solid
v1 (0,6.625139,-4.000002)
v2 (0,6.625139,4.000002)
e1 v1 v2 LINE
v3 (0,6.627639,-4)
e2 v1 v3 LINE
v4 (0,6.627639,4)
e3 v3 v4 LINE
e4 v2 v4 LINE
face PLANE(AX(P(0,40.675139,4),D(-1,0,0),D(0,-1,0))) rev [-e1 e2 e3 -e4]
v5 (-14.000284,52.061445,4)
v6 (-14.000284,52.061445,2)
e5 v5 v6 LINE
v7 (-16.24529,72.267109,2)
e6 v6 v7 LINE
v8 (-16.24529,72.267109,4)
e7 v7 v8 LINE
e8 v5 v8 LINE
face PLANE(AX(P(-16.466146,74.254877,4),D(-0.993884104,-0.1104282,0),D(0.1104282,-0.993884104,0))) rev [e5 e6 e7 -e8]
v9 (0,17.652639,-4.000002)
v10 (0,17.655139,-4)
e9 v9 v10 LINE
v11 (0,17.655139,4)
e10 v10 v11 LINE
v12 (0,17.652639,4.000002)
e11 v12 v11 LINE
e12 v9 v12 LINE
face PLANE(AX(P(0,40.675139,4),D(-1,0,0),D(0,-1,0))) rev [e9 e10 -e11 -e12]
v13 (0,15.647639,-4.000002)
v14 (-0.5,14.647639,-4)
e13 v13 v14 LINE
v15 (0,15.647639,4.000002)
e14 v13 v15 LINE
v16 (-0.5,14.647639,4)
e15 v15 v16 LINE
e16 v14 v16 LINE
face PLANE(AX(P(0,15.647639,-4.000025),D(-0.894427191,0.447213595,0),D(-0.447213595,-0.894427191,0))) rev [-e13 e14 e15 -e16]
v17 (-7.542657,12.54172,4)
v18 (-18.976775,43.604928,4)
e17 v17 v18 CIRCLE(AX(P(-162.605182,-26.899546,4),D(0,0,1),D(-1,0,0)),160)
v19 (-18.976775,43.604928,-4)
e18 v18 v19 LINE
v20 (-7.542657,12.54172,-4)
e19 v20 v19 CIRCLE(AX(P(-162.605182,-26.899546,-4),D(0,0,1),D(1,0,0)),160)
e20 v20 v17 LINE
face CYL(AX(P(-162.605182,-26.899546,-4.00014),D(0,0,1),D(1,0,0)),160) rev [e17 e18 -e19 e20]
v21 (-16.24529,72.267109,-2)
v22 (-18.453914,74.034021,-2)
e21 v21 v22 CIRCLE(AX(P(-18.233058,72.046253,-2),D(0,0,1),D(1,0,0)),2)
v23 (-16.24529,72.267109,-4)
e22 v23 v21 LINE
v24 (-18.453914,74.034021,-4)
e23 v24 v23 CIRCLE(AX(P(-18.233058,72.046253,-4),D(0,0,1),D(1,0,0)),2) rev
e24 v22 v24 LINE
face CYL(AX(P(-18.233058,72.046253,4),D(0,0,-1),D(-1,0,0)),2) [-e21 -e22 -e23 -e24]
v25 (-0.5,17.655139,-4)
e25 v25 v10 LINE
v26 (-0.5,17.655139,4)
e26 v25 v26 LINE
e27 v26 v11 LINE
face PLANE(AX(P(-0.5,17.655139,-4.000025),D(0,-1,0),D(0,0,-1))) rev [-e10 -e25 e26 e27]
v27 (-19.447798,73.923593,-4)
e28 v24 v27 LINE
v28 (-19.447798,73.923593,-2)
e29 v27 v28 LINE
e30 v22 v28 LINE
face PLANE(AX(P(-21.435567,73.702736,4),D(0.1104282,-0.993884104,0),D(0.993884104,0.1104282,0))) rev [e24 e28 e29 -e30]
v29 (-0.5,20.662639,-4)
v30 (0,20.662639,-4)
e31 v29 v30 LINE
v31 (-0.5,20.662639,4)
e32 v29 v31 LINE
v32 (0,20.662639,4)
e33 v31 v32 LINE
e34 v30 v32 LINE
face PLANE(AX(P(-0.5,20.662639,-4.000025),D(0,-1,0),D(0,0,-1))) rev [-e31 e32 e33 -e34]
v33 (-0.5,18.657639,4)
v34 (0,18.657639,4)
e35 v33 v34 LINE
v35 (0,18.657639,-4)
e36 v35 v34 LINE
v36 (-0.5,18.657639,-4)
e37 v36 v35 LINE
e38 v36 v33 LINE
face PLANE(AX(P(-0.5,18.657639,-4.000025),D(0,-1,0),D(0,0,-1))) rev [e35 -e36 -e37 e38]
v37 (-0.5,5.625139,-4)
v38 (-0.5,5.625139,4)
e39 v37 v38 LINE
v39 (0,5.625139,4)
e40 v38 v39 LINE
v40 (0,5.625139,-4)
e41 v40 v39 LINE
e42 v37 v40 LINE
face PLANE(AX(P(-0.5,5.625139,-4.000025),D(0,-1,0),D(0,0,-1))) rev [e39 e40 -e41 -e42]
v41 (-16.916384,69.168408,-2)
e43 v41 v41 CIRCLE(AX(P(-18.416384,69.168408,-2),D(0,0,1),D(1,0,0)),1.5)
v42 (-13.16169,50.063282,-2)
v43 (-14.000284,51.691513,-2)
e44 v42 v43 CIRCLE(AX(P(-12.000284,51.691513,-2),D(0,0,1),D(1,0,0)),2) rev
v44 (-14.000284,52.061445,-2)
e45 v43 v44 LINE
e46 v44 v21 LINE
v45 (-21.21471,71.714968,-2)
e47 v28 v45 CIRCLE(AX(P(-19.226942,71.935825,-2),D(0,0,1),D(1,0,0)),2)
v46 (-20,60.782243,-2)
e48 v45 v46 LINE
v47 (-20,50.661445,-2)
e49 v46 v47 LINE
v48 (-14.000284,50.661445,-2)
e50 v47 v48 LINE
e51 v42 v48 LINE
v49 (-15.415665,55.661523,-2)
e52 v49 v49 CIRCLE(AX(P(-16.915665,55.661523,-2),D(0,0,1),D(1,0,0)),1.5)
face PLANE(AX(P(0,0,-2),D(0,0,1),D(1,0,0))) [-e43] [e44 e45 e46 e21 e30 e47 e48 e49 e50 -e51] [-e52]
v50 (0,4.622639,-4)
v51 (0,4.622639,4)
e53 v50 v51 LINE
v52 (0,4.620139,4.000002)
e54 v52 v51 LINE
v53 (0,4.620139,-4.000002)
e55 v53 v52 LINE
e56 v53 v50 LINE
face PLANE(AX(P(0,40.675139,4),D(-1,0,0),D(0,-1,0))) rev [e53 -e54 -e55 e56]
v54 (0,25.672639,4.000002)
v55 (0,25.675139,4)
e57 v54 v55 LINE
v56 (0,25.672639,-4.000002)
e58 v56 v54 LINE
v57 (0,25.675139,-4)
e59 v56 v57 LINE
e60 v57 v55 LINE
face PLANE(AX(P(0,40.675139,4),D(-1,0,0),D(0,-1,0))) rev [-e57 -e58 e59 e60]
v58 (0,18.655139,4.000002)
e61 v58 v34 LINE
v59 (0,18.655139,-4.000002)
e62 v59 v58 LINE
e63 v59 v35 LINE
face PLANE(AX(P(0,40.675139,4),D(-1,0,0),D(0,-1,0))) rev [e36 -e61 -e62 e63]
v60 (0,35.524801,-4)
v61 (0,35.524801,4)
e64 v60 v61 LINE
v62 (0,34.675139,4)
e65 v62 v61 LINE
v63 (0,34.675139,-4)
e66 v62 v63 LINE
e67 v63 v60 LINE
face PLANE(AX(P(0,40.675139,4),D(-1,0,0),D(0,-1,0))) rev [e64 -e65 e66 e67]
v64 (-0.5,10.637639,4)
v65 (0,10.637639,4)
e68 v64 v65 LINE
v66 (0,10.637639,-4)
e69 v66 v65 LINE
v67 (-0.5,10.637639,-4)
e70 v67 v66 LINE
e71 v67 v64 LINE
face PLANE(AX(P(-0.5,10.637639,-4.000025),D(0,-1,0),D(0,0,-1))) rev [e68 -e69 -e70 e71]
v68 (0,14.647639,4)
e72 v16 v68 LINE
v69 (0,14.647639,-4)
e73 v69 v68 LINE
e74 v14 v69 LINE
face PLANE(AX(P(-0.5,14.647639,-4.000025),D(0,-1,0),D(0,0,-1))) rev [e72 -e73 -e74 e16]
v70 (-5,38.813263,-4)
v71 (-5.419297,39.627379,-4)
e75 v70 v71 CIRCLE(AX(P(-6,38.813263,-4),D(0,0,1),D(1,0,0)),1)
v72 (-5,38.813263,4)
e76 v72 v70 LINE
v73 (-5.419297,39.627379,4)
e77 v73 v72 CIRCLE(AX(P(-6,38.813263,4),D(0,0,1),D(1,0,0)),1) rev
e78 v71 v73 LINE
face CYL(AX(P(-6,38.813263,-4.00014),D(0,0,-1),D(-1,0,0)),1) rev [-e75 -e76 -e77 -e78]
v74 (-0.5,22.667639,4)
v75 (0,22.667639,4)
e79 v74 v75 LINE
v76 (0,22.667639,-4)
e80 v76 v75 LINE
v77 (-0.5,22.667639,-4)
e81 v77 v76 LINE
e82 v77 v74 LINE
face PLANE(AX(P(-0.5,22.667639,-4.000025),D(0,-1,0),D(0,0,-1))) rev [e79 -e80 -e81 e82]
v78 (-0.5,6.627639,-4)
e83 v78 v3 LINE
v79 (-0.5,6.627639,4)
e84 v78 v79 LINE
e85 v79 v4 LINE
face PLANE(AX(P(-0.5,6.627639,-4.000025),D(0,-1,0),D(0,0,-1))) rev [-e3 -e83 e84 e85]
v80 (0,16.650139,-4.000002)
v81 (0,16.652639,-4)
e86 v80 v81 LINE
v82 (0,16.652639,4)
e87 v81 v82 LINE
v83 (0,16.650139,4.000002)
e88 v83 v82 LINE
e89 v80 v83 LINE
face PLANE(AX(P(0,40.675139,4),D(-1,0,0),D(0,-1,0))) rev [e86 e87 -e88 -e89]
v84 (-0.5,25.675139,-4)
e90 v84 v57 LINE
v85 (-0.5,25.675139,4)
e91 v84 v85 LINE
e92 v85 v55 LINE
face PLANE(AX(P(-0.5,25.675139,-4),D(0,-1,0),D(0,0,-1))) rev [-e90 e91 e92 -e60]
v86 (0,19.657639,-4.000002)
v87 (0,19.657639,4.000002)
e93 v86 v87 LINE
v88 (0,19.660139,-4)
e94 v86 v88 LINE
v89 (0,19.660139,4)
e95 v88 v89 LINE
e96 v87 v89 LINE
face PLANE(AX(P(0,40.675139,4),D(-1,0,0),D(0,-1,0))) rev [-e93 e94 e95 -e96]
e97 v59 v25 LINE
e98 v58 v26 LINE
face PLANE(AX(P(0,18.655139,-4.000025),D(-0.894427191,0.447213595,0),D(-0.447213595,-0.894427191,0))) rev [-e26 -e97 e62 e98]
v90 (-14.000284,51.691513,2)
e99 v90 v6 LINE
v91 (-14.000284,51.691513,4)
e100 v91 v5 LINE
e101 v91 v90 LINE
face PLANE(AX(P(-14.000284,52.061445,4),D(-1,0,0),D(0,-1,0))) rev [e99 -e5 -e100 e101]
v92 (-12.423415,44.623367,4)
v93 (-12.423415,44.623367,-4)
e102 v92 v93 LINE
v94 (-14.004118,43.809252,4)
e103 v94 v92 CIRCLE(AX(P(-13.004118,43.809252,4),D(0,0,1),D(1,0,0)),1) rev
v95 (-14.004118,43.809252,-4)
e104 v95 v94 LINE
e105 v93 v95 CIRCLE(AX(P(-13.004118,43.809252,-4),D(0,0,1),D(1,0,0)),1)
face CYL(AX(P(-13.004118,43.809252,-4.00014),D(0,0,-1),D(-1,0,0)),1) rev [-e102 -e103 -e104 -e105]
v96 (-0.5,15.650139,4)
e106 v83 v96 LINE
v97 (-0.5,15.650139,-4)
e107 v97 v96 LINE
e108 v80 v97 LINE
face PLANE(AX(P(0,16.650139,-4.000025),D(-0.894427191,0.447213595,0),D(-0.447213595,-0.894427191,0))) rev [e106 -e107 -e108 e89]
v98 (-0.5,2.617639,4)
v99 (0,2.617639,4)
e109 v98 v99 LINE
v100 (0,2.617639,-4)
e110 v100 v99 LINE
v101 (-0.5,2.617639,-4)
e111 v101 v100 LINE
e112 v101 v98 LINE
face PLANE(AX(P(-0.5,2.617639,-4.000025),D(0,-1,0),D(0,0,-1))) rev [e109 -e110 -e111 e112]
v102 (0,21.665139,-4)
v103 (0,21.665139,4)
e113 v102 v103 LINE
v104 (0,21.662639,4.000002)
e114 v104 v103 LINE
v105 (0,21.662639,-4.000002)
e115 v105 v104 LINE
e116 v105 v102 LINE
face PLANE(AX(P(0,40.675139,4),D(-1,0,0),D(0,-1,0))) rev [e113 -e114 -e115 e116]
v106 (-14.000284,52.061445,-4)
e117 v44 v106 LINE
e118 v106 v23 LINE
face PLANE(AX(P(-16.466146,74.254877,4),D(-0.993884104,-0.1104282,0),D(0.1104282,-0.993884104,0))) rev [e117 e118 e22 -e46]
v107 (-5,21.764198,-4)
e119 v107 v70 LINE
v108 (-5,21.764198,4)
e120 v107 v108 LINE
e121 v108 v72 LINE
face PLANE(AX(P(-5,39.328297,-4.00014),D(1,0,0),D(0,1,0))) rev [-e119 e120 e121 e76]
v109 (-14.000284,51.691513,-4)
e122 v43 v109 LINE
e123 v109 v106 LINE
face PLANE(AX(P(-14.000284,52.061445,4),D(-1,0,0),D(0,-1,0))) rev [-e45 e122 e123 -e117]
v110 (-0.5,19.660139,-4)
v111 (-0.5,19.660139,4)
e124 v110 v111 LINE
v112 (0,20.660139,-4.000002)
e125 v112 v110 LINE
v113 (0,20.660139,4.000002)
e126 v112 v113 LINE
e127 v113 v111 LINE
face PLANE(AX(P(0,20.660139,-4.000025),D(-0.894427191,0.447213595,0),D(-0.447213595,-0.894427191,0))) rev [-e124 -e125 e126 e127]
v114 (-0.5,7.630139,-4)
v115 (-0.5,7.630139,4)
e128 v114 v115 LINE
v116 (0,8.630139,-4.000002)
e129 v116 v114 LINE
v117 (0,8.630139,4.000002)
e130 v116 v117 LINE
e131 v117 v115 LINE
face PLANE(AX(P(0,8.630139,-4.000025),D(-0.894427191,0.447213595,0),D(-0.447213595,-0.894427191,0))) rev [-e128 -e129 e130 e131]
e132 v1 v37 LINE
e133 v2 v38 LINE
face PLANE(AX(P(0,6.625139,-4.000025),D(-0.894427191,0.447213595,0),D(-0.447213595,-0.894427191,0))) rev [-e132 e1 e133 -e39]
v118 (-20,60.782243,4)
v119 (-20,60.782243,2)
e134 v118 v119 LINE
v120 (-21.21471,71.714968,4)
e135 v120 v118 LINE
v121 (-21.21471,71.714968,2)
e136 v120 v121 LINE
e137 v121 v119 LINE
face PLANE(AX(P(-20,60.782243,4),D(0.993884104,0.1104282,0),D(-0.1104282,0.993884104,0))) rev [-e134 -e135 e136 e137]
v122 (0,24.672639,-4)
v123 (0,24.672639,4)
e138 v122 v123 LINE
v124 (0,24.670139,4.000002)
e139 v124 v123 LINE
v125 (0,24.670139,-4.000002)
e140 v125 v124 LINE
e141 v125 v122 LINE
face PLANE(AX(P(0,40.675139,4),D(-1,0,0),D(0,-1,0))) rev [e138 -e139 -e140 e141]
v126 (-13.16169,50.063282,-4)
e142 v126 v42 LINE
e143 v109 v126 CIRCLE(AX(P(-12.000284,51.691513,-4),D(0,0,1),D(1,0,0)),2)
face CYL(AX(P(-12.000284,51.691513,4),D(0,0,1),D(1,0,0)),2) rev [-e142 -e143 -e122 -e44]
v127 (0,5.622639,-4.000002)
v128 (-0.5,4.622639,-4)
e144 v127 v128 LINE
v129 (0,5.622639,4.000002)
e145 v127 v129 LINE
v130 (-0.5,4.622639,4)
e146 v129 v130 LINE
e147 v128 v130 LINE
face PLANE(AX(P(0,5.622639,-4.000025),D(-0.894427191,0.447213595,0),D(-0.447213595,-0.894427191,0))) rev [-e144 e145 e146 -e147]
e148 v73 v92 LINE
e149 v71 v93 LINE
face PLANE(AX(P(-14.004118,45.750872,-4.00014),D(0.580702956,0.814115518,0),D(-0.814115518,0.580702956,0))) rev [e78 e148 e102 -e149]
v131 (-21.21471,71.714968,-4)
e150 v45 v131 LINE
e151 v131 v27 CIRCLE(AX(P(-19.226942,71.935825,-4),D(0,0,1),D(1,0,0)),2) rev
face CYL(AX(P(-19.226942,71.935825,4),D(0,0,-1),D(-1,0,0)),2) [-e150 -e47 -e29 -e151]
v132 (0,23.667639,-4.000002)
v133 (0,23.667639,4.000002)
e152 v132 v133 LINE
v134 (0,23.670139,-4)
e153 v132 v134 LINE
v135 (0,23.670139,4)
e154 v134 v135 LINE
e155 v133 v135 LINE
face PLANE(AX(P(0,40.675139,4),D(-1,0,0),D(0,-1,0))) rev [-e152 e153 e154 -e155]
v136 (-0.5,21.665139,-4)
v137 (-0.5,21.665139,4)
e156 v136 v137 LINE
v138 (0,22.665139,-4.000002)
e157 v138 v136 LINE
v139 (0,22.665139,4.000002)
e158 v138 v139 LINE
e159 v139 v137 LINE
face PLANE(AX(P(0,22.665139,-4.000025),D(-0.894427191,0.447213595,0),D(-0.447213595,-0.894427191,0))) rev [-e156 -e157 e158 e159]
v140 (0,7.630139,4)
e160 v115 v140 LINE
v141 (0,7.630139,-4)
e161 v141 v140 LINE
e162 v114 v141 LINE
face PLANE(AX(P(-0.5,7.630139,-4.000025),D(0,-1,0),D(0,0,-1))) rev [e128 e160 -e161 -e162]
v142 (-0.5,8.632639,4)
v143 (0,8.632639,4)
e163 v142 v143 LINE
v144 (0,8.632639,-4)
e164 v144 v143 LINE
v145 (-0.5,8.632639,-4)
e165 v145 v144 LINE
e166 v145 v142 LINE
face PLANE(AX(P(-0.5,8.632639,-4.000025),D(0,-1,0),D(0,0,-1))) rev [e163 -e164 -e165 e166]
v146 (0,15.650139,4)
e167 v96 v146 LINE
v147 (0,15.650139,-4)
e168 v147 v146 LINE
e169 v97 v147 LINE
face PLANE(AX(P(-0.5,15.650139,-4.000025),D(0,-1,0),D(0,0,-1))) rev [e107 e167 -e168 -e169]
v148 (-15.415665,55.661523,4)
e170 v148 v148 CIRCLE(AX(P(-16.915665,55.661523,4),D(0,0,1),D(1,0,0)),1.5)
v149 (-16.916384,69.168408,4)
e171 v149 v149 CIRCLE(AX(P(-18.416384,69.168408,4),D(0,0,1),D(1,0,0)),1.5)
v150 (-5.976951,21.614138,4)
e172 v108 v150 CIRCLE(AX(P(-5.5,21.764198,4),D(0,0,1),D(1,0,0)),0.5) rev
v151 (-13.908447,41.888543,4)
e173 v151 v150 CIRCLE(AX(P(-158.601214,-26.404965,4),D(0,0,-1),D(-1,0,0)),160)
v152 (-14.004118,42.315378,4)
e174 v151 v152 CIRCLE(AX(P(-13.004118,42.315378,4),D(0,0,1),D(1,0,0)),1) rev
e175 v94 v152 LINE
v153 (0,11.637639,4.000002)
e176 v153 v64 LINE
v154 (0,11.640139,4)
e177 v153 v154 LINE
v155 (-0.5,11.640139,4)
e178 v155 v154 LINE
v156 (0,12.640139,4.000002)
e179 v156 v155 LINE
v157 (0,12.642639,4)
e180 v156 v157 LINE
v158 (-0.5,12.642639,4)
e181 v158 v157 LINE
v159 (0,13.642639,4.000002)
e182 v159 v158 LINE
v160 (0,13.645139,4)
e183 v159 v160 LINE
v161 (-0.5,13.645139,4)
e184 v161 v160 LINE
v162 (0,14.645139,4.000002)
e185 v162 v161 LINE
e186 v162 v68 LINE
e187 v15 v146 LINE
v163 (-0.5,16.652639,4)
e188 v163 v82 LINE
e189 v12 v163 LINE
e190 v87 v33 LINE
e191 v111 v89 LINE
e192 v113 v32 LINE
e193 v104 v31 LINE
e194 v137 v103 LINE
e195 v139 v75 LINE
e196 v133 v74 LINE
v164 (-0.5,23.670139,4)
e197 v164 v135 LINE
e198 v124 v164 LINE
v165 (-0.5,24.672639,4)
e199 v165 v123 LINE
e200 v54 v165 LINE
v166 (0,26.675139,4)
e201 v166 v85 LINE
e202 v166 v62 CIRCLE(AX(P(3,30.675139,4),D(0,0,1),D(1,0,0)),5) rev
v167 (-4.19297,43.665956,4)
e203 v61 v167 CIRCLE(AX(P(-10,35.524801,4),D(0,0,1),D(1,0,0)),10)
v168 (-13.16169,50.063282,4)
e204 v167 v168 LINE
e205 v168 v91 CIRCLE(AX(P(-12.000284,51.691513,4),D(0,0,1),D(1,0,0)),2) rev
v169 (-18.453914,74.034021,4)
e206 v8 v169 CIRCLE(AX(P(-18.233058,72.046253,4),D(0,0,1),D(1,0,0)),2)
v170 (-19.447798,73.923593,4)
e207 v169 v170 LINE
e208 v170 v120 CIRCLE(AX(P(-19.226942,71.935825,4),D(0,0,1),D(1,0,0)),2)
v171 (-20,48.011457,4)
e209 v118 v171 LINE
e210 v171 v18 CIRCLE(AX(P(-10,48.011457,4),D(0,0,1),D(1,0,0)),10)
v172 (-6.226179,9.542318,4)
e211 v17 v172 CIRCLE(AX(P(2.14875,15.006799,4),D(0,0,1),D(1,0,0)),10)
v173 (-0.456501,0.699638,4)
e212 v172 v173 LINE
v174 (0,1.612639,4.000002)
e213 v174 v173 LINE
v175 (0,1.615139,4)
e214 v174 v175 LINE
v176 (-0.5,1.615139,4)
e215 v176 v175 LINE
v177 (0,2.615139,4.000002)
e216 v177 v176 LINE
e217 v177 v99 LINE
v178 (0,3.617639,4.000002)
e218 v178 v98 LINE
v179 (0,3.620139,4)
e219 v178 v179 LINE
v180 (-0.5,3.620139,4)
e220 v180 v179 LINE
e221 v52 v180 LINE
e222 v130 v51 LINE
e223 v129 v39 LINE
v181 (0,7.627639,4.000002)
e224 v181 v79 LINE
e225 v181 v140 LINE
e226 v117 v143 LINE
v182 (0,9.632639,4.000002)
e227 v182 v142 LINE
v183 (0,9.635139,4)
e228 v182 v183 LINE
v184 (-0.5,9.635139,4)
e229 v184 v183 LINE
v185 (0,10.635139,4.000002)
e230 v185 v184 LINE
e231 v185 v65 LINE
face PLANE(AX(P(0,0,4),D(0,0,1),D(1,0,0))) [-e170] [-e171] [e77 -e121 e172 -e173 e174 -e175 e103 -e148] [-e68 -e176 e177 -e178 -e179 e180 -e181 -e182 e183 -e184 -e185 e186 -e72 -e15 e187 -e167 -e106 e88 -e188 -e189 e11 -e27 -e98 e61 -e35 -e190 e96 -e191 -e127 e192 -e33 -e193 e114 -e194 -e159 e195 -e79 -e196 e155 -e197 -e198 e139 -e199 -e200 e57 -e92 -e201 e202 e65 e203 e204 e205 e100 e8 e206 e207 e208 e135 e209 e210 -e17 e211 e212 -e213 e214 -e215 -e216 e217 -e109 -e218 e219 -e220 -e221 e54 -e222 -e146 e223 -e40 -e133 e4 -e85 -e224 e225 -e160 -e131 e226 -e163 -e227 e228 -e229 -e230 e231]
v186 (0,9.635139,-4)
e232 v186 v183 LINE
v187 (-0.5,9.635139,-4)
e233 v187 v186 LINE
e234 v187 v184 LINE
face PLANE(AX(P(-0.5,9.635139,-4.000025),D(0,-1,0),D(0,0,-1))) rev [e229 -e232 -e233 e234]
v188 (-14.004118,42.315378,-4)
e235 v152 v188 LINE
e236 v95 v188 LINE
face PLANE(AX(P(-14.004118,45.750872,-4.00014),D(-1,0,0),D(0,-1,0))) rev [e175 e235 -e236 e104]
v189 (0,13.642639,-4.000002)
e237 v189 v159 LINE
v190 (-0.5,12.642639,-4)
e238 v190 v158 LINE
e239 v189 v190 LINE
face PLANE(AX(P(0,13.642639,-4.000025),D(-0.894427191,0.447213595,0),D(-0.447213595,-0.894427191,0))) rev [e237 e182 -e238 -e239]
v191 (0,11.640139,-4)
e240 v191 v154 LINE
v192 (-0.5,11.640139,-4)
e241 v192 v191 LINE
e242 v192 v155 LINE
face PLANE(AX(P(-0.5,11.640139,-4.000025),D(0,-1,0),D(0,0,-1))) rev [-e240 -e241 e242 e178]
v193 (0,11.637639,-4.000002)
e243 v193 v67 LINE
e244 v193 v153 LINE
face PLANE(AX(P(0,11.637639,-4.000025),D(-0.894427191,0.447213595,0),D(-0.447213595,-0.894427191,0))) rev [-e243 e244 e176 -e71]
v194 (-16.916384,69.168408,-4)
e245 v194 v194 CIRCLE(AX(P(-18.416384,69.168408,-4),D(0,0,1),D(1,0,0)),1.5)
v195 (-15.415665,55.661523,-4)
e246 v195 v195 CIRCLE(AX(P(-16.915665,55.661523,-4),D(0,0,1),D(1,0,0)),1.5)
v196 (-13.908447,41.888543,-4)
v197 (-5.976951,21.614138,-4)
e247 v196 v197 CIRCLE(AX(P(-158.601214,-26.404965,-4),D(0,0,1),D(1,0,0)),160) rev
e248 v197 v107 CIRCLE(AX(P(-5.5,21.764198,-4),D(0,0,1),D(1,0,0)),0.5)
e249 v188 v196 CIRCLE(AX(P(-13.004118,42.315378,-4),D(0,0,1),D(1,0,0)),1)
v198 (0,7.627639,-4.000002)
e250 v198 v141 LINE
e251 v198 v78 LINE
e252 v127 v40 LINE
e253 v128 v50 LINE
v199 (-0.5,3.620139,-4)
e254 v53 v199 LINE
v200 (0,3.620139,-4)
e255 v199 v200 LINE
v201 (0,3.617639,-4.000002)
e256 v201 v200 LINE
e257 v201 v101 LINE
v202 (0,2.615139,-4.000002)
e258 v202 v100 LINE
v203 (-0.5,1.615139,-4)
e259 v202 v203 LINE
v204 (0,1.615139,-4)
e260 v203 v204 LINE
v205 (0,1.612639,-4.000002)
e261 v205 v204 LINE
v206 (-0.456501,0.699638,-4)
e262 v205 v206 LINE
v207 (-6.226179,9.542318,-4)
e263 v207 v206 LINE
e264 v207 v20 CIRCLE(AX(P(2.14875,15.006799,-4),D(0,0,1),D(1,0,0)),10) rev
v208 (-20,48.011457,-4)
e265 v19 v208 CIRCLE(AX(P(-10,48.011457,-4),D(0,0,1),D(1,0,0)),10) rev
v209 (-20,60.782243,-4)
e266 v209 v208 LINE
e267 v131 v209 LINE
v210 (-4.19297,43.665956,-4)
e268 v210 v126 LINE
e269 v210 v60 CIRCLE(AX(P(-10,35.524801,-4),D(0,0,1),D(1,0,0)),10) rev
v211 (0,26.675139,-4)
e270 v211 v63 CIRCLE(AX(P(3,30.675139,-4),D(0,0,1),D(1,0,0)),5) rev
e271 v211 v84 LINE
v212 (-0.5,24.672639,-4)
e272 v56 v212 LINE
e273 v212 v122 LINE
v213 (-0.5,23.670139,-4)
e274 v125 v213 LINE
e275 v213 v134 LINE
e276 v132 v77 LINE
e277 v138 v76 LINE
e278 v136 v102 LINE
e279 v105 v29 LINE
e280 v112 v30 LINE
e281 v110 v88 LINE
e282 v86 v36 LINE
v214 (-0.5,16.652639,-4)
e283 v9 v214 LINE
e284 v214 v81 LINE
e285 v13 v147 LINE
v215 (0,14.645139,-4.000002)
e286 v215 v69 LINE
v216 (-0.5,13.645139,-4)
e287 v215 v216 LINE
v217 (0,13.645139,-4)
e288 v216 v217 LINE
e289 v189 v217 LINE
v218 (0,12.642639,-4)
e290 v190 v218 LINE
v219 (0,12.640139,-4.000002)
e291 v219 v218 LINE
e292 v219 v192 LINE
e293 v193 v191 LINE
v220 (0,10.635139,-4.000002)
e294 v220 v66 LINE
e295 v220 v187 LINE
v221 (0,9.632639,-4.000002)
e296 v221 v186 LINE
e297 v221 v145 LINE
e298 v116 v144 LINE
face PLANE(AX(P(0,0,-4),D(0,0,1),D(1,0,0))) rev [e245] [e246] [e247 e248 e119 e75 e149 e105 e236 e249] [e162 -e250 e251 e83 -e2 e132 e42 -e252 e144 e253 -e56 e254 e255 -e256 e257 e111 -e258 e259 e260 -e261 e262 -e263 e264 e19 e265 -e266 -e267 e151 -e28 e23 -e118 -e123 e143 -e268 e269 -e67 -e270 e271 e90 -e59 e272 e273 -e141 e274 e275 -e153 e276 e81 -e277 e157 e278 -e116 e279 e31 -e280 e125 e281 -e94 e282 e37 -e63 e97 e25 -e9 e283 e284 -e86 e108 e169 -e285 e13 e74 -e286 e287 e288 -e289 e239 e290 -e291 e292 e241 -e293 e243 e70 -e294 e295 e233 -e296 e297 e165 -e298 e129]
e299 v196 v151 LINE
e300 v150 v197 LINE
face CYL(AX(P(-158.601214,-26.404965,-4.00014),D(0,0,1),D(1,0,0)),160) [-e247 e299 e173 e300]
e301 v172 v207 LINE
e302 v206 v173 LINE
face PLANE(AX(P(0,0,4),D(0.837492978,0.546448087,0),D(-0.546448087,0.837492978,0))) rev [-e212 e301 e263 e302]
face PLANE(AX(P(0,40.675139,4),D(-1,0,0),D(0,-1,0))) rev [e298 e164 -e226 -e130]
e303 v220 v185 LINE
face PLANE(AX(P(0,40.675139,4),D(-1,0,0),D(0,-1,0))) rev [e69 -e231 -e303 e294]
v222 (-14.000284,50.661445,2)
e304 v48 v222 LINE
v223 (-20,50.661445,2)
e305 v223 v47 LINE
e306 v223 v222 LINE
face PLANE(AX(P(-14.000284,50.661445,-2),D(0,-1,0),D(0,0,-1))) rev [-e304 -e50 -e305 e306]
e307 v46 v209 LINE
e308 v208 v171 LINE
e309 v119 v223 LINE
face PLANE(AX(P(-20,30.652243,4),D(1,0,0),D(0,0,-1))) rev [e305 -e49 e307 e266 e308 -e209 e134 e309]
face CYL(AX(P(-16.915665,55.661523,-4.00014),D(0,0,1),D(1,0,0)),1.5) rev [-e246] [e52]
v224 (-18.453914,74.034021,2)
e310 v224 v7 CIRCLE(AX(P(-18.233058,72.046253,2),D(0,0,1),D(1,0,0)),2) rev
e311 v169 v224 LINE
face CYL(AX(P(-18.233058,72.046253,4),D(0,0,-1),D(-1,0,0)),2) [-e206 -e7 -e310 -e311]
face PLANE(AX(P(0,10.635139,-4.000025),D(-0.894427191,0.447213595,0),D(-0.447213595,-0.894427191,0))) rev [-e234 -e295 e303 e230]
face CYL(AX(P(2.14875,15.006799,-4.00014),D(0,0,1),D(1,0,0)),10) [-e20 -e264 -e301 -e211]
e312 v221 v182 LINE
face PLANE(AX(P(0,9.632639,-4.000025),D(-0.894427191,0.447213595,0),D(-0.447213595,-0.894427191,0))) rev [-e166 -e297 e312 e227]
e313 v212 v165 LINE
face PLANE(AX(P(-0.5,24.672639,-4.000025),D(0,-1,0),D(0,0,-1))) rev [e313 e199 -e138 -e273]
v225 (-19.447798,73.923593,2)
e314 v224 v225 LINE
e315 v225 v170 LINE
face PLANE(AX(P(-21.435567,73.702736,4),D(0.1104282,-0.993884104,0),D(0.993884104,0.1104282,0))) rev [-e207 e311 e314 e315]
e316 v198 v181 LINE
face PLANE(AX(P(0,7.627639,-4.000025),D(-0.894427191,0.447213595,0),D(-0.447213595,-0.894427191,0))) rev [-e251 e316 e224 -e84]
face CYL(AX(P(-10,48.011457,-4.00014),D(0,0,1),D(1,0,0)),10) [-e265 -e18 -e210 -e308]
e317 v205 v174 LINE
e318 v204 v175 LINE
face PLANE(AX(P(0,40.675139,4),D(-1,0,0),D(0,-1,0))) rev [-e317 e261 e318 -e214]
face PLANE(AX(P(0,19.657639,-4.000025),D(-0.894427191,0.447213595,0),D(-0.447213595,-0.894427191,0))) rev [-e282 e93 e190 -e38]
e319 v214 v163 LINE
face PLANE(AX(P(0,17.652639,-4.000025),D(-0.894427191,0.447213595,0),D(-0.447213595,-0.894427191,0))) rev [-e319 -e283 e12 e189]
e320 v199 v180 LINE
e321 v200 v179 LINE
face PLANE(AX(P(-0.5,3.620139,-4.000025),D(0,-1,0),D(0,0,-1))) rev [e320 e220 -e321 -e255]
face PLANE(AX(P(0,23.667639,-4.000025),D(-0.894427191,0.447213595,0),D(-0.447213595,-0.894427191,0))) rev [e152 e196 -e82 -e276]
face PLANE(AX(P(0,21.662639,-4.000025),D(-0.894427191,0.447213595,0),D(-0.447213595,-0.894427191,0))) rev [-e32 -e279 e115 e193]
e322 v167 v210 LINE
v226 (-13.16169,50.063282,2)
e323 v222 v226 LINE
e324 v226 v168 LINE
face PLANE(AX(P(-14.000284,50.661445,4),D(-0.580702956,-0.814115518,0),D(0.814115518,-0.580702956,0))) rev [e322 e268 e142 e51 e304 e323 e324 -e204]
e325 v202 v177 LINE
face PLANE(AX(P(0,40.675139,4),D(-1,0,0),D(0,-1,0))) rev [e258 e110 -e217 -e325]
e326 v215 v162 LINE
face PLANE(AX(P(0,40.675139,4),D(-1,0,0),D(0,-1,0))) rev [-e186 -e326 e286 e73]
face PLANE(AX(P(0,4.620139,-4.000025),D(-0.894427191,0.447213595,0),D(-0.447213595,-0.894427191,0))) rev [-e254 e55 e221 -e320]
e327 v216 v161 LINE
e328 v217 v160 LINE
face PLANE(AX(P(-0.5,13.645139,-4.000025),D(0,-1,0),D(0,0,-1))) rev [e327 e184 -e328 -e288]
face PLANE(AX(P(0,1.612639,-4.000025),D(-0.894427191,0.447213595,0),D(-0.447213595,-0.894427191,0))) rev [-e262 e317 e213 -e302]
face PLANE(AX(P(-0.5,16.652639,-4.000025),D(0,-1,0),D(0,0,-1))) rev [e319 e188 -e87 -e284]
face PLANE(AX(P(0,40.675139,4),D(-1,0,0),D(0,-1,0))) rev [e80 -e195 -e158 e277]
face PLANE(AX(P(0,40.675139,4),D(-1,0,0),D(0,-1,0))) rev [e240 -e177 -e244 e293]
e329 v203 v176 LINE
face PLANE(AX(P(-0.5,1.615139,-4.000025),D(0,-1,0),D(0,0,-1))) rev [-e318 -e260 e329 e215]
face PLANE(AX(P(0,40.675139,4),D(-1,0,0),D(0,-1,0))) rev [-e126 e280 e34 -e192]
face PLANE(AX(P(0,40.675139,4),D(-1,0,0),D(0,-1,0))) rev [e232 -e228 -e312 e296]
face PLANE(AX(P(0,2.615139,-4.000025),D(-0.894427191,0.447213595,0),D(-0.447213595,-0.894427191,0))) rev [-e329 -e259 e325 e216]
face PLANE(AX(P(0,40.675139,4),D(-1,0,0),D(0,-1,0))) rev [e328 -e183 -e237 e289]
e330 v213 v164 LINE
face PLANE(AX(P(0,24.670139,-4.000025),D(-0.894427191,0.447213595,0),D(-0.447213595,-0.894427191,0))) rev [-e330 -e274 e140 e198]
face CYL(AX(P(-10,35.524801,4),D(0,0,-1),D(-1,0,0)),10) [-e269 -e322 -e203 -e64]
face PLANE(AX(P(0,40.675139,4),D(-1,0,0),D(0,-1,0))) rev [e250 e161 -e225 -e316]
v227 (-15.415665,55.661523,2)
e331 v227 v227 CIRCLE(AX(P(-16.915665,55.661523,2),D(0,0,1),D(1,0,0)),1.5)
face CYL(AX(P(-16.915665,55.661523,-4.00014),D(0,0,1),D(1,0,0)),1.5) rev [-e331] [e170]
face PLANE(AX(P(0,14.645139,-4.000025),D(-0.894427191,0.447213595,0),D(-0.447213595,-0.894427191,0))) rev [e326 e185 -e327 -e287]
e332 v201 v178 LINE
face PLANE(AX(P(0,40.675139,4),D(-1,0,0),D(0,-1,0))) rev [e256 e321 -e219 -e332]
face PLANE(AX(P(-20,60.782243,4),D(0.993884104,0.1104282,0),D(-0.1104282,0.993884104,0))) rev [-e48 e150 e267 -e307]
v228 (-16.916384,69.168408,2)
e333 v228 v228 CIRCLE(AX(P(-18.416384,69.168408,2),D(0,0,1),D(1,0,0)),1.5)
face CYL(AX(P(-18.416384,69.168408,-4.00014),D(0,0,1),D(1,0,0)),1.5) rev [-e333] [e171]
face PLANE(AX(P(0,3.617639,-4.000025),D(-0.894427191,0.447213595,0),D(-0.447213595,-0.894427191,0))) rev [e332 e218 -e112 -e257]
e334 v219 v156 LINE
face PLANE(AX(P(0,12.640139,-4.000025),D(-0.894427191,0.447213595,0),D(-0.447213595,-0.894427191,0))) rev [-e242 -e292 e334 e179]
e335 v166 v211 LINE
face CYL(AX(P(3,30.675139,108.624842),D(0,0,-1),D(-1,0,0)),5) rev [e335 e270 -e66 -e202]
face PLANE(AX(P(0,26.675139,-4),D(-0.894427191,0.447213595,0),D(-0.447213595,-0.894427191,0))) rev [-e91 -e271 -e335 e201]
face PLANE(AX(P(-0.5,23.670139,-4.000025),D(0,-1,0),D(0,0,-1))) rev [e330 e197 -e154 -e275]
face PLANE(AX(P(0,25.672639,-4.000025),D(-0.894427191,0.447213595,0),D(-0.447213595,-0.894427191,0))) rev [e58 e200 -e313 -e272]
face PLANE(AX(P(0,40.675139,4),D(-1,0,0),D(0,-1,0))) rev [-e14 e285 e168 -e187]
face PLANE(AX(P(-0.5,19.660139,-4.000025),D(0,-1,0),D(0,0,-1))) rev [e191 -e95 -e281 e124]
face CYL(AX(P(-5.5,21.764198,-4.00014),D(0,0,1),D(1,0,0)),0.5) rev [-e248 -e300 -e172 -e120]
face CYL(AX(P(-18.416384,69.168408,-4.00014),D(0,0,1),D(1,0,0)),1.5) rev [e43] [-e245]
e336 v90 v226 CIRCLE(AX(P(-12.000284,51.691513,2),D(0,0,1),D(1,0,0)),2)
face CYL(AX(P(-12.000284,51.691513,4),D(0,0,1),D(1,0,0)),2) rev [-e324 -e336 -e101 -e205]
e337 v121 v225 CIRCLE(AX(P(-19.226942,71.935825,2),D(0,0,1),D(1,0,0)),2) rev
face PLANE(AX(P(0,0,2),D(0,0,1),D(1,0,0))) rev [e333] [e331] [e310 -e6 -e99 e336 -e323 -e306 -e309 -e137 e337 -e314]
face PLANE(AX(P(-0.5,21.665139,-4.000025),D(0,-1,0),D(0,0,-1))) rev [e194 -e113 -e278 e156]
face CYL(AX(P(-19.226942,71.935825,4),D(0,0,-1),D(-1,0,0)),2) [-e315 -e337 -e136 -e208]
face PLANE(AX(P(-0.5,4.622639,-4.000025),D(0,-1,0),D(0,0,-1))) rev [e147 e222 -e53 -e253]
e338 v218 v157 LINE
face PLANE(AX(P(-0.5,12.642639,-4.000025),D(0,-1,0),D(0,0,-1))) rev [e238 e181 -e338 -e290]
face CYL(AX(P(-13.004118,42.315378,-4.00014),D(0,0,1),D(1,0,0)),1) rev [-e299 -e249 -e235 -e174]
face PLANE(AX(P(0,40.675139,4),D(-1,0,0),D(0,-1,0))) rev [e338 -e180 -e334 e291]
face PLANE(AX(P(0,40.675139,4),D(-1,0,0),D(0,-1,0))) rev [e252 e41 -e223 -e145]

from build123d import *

# Parameters (mm, degrees)
BOSS_EXTRUDE1_DEPTH     = 4
SKETCH2_W               = 20
SKETCH2_H               = 25
CUT_EXTRUDE1_DEPTH      = 2
CUT_EXTRUDE2_DEPTH      = 78.699873386
CUT_EXTRUDE2_DEPTH_BACK = 78.699873386
CUT_EXTRUDE3_DEPTH      = 78.699873386
LPATTERN3_START         = -4
LPATTERN3_DEPTH         = 8
CUT_EXTRUDE4_DEPTH      = 78.699873386
CUT_EXTRUDE5_DEPTH      = 78.699873386
FILLET1_R               = 10
FILLET2_R               = 2
FILLET3_R               = 1
FILLET4_R               = 0.5
SKETCH7_R               = 1.5
CUT_EXTRUDE6_DEPTH      = 78.443079806


# Read off the part's stored shape, not the designer's step: LPattern3
with BuildPart() as part:
    # Sketch1 → Boss-Extrude1 (new, symmetric)
    with BuildSketch(Plane.XY):
        Polygon((0, 0), (-20, 30.652242985), (-20, 60.782242985), (-21.435566599, 73.70273634), (-16.466146078, 74.25487734), (-14.000284373, 52.061445292), (-14.000284373, 50.661445292), (0, 40.6751395), align=None)
    extrude(amount=BOSS_EXTRUDE1_DEPTH, both=True)

    # Sketch2 → Cut-Extrude1 (cut, symmetric)
    with BuildSketch(Plane.XY):
        with Locations((-24.000284373, 63.161445292)):
            Rectangle(SKETCH2_W, SKETCH2_H)
    extrude(amount=CUT_EXTRUDE1_DEPTH, both=True, mode=Mode.SUBTRACT)

    # Sketch3 → Cut-Extrude2 (cut, two sides: drawn at the far end of the back side and taken through both)
    with BuildSketch(Plane.XY.offset(4).offset(-CUT_EXTRUDE2_DEPTH_BACK)):
        with BuildLine():
            Line((91.496624596, 103.297607947), (0, 34.6751395))
            ThreePointArc((0, 34.6751395), (-2, 30.6751395), (0, 26.6751395))
            Line((0, 26.6751395), (91.496624596, -41.947328947))
            Line((91.496624596, -41.947328947), (320.238186086, -41.947328947))
            Line((320.238186086, -41.947328947), (320.238186086, 103.297607947))
            Line((320.238186086, 103.297607947), (91.496624596, 103.297607947))
        make_face()
    extrude(amount=CUT_EXTRUDE2_DEPTH + CUT_EXTRUDE2_DEPTH_BACK, mode=Mode.SUBTRACT)

    # Sketch4 → Cut-Extrude3 (cut, symmetric)
    with BuildSketch(Plane.XY.offset(4)):
        Polygon((0, 26.6751395), (-0.5, 25.6751395), (0, 25.6751395), align=None)
    extrude(amount=CUT_EXTRUDE3_DEPTH, both=True, mode=Mode.SUBTRACT)

    # LPattern3 outline → LPattern3 (cut)
    with BuildSketch(Plane.XY.offset(LPATTERN3_START)):
        Polygon((0, 0), (0, 1.6126395), (-0.456500581, 0.699638337), align=None)
        Polygon((-0.5, 24.6726395), (0, 24.6726395), (0, 25.6726395), align=None)
        Polygon((-0.5, 23.6701395), (0, 23.6701395), (0, 24.6701395), align=None)
        Polygon((-0.5, 22.6676395), (0, 22.6676395), (0, 23.6676395), align=None)
        Polygon((-0.5, 21.6651395), (0, 21.6651395), (0, 22.6651395), align=None)
        Polygon((-0.5, 20.6626395), (0, 20.6626395), (0, 21.6626395), align=None)
        Polygon((-0.5, 19.6601395), (0, 19.6601395), (0, 20.6601395), align=None)
        Polygon((-0.5, 18.6576395), (0, 18.6576395), (0, 19.6576395), align=None)
        Polygon((-0.5, 17.6551395), (0, 17.6551395), (0, 18.6551395), align=None)
        Polygon((-0.5, 16.6526395), (0, 16.6526395), (0, 17.6526395), align=None)
        Polygon((-0.5, 15.6501395), (0, 15.6501395), (0, 16.6501395), align=None)
        Polygon((-0.5, 14.6476395), (0, 14.6476395), (0, 15.6476395), align=None)
        Polygon((-0.5, 13.6451395), (0, 13.6451395), (0, 14.6451395), align=None)
        Polygon((-0.5, 12.6426395), (0, 12.6426395), (0, 13.6426395), align=None)
        Polygon((-0.5, 11.6401395), (0, 11.6401395), (0, 12.6401395), align=None)
        Polygon((-0.5, 10.6376395), (0, 10.6376395), (0, 11.6376395), align=None)
        Polygon((-0.5, 9.6351395), (0, 9.6351395), (0, 10.6351395), align=None)
        Polygon((-0.5, 8.6326395), (0, 8.6326395), (0, 9.6326395), align=None)
        Polygon((-0.5, 7.6301395), (0, 7.6301395), (0, 8.6301395), align=None)
        Polygon((-0.5, 6.6276395), (0, 6.6276395), (0, 7.6276395), align=None)
        Polygon((-0.5, 5.6251395), (0, 5.6251395), (0, 6.6251395), align=None)
        Polygon((-0.5, 4.6226395), (0, 4.6226395), (0, 5.6226395), align=None)
        Polygon((-0.5, 3.6201395), (0, 3.6201395), (0, 4.6201395), align=None)
        Polygon((-0.5, 2.6176395), (0, 2.6176395), (0, 3.6176395), align=None)
        Polygon((-0.5, 1.6151395), (0, 1.6151395), (0, 2.6151395), align=None)
    extrude(amount=LPATTERN3_DEPTH, mode=Mode.SUBTRACT)

    # Sketch5 → Cut-Extrude4 (cut, through all)
    with BuildSketch(Plane.XY.offset(4)):
        with BuildLine():
            Line((-20, 45.652242985), (-20, 30.652242985))
            Line((-20, 30.652242985), (-7.147540984, 10.954408149))
            ThreePointArc((-7.147540984, 10.954408149), (-12.567364929, 28.676109238), (-20, 45.652242985))
        make_face()
    extrude(amount=-CUT_EXTRUDE4_DEPTH, mode=Mode.SUBTRACT)

    # Sketch6 → Cut-Extrude5 (cut, through all)
    with BuildSketch(Plane.XY.offset(4)):
        with BuildLine():
            Line((-14.004117633, 45.750871885), (-5, 39.328297195))
            Line((-5, 39.328297195), (-5, 18.390871885))
            ThreePointArc((-5, 18.390871885), (-9.031897039, 30.419496018), (-14.004117633, 42.090871885))
            Line((-14.004117633, 42.090871885), (-14.004117633, 45.750871885))
        make_face()
    extrude(amount=-CUT_EXTRUDE5_DEPTH, mode=Mode.SUBTRACT)

    # Fillet1
    fillet1_edges = [part.edges().sort_by_distance(p)[0] for p in [
        (-20, 45.652242985, 0),
        (-7.147540984, 10.954408149, 0),
        (0, 40.6751395, 0),
    ]]
    fillet(fillet1_edges, radius=FILLET1_R)

    # Fillet2
    fillet2_edges = [part.edges().sort_by_distance(p)[0] for p in [
        (-14.000284373, 50.661445292, -3),
        (-16.466146078, 74.25487734, -3),
        (-21.435566599, 73.70273634, -3),
        (-14.000284373, 50.661445292, 3),
        (-16.466146078, 74.25487734, 3),
        (-21.435566599, 73.70273634, 3),
    ]]
    fillet(fillet2_edges, radius=FILLET2_R)

    # Fillet3
    fillet3_edges = [part.edges().sort_by_distance(p)[0] for p in [
        (-14.004117633, 42.090871885, 0),
        (-14.004117633, 45.750871885, 0),
        (-5, 39.328297195, 0),
    ]]
    fillet(fillet3_edges, radius=FILLET3_R)

    # Fillet4
    fillet4_edges = [part.edges().sort_by_distance(p)[0] for p in [
        (-5, 18.390871885, 0),
    ]]
    fillet(fillet4_edges, radius=FILLET4_R)

    # Sketch7 → Cut-Extrude6 (cut, through all)
    with BuildSketch(Plane.XY.offset(4)):
        with Locations((-18.416383851, 69.168407775)):
            Circle(SKETCH7_R)
        with Locations((-16.915664614, 55.661522799)):
            Circle(SKETCH7_R)
    extrude(amount=-CUT_EXTRUDE6_DEPTH, mode=Mode.SUBTRACT)


solid = part.part
